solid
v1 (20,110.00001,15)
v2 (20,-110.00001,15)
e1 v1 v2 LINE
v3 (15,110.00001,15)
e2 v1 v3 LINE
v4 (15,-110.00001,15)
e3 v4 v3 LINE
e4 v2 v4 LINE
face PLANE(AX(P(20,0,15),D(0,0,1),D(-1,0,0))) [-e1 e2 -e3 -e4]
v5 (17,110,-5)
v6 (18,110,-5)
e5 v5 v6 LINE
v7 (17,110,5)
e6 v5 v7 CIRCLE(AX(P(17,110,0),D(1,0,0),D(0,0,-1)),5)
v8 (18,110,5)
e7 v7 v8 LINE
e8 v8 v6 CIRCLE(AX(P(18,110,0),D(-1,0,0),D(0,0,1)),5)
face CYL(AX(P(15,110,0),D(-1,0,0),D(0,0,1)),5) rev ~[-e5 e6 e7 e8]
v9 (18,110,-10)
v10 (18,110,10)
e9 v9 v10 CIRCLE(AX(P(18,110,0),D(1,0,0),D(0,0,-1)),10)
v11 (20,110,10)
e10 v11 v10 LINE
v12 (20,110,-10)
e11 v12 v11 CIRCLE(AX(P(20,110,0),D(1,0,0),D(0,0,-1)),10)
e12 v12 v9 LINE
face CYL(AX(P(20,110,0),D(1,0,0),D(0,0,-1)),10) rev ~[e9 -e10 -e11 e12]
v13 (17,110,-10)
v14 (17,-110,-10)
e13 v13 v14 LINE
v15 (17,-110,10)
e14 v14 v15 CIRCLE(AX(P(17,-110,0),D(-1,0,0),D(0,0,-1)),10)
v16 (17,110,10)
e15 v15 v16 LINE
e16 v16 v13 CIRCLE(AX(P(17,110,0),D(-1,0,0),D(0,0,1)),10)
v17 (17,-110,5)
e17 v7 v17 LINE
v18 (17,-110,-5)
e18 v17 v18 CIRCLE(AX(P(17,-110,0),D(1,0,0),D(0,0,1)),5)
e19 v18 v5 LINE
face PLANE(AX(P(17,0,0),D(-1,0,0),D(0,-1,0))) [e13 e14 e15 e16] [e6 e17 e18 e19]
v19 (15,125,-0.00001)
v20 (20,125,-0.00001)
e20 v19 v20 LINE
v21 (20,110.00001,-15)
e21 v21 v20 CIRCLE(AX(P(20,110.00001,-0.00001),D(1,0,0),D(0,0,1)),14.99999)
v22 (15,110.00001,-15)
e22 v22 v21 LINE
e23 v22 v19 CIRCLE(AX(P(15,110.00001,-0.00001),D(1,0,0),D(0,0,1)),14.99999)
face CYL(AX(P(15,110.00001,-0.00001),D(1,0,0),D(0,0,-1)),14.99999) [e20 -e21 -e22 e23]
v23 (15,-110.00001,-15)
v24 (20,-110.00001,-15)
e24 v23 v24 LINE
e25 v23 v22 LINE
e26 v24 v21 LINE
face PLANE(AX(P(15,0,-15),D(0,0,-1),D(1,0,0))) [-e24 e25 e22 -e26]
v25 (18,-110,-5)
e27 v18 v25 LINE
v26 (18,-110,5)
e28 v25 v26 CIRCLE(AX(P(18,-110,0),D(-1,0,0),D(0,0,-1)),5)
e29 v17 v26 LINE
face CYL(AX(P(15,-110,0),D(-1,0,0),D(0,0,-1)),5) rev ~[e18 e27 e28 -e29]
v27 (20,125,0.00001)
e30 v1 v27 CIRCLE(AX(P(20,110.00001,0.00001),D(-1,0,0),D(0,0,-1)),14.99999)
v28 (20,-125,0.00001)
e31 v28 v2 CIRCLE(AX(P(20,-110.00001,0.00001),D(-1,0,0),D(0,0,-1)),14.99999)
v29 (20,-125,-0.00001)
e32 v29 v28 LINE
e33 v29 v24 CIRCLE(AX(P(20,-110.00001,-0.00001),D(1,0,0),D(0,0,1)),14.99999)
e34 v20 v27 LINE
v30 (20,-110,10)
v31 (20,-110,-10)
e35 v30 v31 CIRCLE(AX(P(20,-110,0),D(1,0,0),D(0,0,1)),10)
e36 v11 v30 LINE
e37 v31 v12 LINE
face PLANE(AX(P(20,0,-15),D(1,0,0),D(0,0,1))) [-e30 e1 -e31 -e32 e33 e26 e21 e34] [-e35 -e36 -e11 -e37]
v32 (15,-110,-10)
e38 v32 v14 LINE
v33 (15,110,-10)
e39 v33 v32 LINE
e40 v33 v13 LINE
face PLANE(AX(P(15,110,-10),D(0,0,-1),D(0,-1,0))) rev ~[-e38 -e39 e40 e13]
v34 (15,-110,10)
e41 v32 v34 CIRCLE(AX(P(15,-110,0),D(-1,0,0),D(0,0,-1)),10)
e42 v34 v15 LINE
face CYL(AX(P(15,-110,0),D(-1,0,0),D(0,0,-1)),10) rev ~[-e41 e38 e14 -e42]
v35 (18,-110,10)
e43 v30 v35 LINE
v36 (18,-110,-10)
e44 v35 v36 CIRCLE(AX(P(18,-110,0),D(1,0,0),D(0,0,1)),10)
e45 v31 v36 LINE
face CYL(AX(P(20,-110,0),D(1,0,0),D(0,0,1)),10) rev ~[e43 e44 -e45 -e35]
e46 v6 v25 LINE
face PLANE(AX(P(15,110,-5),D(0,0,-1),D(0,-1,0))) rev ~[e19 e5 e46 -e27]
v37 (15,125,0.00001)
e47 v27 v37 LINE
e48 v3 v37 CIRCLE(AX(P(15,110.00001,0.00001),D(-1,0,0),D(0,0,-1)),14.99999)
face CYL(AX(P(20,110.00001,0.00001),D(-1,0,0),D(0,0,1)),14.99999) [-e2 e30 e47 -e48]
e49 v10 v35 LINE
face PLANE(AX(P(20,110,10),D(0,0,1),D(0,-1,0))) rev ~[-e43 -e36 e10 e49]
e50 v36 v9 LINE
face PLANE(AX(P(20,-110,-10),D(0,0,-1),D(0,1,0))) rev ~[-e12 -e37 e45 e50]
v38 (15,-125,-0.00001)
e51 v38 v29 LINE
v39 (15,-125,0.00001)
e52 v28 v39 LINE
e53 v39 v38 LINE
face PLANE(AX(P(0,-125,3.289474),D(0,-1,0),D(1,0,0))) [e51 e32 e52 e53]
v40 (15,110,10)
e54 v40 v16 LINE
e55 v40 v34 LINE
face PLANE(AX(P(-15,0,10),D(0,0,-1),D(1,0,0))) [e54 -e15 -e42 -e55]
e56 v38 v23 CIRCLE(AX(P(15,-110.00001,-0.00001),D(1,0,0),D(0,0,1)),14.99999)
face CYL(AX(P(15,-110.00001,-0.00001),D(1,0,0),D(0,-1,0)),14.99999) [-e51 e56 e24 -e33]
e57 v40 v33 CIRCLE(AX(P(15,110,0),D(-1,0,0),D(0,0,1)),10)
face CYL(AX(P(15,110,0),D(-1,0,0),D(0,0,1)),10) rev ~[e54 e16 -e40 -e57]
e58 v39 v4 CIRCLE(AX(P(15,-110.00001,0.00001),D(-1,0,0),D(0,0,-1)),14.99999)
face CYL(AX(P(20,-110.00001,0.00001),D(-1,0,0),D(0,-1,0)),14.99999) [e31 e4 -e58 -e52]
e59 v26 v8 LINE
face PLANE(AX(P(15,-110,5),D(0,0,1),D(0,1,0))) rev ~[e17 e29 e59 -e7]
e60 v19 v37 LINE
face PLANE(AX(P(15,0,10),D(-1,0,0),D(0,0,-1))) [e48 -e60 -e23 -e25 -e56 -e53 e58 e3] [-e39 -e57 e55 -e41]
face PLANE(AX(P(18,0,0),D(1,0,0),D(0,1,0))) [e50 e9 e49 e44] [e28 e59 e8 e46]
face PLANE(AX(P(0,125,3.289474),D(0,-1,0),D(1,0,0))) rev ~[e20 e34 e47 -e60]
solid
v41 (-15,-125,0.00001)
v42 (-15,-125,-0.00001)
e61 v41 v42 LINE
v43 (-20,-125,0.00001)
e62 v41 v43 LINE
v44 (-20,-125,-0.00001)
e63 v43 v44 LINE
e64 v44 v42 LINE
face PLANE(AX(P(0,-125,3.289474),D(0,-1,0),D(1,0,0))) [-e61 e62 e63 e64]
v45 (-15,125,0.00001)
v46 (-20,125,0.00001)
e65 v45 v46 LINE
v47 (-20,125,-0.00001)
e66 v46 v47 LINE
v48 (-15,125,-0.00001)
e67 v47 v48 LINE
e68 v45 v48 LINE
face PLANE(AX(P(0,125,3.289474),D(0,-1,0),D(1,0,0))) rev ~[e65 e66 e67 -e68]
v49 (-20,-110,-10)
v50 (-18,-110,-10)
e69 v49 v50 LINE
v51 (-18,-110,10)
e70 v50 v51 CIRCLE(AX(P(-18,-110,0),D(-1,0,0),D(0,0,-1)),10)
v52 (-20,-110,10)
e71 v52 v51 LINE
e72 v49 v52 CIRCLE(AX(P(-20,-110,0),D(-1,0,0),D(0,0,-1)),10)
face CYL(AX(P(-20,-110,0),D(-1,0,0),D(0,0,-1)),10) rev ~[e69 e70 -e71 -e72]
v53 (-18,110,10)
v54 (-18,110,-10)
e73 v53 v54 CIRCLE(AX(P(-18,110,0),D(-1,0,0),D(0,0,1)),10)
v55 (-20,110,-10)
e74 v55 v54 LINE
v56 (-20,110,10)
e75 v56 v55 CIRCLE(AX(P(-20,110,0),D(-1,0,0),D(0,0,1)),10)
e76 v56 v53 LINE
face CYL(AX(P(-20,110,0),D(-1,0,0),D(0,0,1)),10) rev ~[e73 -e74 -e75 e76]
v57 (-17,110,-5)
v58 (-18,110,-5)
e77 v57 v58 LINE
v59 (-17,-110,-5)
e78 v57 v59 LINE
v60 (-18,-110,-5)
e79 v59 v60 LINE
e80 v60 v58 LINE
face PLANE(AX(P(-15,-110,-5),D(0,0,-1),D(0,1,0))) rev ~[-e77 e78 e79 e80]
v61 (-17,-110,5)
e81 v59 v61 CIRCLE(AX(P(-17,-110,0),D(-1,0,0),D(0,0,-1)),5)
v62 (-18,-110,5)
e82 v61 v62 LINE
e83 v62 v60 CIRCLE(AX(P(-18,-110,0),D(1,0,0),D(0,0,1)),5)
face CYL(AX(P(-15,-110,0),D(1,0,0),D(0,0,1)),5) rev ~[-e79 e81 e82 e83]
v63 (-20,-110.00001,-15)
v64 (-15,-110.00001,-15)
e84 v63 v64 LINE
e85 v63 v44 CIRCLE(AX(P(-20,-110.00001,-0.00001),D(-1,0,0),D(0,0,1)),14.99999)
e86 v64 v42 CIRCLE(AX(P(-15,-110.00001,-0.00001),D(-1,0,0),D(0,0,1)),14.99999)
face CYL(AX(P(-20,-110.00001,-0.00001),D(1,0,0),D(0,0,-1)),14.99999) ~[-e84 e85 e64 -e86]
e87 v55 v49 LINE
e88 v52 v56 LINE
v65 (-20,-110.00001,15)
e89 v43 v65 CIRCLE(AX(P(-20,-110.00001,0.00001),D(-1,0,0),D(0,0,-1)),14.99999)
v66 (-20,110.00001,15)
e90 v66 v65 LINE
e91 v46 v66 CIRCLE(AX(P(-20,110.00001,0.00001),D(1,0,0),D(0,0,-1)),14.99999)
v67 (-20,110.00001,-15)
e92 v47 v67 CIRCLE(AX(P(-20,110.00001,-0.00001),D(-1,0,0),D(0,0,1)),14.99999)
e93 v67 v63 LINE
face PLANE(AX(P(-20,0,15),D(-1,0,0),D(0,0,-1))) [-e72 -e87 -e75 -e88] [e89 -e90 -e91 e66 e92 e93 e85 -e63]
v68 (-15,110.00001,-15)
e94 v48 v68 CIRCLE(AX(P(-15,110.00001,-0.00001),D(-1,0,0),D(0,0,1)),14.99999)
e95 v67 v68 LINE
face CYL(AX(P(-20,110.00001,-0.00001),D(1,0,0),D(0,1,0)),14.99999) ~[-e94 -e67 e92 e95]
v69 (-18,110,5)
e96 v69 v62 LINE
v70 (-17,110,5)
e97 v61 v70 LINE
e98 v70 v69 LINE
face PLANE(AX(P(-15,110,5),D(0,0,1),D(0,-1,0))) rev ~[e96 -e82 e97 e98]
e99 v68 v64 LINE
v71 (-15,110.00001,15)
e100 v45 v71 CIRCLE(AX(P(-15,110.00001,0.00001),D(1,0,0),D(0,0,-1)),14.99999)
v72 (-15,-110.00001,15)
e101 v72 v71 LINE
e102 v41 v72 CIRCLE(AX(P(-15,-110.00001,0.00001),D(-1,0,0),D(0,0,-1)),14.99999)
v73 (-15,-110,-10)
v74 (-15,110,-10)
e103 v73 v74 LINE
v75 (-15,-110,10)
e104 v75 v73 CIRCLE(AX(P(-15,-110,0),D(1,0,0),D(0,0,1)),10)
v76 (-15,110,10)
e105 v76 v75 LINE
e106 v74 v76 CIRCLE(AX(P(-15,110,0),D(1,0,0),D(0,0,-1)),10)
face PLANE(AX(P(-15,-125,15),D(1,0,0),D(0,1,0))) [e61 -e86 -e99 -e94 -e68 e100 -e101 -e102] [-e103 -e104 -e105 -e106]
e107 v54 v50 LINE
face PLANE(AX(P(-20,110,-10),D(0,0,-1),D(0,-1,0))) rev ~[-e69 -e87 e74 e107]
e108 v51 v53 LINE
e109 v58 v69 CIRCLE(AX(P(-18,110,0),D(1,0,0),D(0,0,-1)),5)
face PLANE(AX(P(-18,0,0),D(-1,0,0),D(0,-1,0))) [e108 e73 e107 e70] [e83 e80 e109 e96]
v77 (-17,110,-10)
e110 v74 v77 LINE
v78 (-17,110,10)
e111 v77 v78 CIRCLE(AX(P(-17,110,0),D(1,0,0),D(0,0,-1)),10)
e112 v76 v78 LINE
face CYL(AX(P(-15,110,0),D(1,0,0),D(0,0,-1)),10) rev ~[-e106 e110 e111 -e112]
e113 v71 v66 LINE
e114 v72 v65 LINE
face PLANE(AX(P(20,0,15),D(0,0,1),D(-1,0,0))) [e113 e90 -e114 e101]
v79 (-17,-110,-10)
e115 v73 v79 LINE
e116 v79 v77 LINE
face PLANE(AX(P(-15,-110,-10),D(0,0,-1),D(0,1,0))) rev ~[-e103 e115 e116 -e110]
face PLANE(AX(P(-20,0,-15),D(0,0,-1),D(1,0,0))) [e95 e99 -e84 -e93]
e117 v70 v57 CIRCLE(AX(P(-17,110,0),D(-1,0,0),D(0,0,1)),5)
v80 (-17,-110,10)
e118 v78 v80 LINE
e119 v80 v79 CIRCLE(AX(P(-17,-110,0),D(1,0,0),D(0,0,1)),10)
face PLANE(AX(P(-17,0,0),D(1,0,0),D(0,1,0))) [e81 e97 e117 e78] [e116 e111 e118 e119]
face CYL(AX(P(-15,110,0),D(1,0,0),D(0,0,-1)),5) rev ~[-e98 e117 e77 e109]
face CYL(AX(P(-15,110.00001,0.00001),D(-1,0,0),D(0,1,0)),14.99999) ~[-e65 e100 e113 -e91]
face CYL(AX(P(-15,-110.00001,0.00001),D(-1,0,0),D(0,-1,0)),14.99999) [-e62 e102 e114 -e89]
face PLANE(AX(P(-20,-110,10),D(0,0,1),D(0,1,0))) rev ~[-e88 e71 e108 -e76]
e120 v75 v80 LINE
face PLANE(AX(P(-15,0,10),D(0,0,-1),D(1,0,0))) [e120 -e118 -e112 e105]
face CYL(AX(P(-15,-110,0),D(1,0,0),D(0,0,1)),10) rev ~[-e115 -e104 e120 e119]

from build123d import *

# Parameters (mm, degrees)
F1_DEPTH      = 125
F1_DEPTH_BACK = 125
F6_DEPTH      = 5.001
F7_DEPTH      = 5.001
F8_DEPTH      = 2
F9_DEPTH      = 2
F10_DEPTH     = 2
F11_DEPTH     = 2
F12_W         = 30
F12_H         = 250
F13_DEPTH     = 30.001
F14_R         = 14.99999


# Not quite as in the source:
# - a fillet or chamfer is up to 0.001 mm smaller than in the source, because OpenCascade refuses the exact size


with BuildPart() as f1:
    # F0 (on Front) → F1 (new body, two sides)
    with BuildSketch(Plane.XZ) as f1_sk:
        Polygon((20, -15), (20, 15), (-20, 15), (-20, -15), (-15, -15), (-15, 10), (15, 10), (15, -15), align=None)
    extrude(amount=F1_DEPTH)
    extrude(f1_sk.sketch, amount=-F1_DEPTH_BACK)

    # F2 (on face) → F6 (cut, through all)
    with BuildSketch(Plane(origin=(15, 0, 0), x_dir=(0, -1, 0), z_dir=(-1, 0, 0))):
        with BuildLine():
            Line((-110, -5), (110, -5))
            ThreePointArc((110, -5), (115, 0), (110, 5))
            Line((110, 5), (-110, 5))
            ThreePointArc((-110, 5), (-115, 0), (-110, -5))
        make_face()
    extrude(amount=-F6_DEPTH, mode=Mode.SUBTRACT)

    # F4 (on face) → F7 (cut, through all)
    with BuildSketch(Plane.YZ.offset(-15)):
        with BuildLine():
            Line((110, 5), (-110, 5))
            ThreePointArc((-110, 5), (-115, 0), (-110, -5))
            Line((-110, -5), (110, -5))
            ThreePointArc((110, -5), (115, 0), (110, 5))
        make_face()
    extrude(amount=-F7_DEPTH, mode=Mode.SUBTRACT)

    # F2 (on face) → F8 (cut)
    with BuildSketch(Plane(origin=(15, 0, 0), x_dir=(0, -1, 0), z_dir=(-1, 0, 0))):
        with BuildLine():
            Line((-110, -10), (110, -10))
            ThreePointArc((110, -10), (120, 0), (110, 10))
            Line((110, 10), (-110, 10))
            ThreePointArc((-110, 10), (-120, 0), (-110, -10))
        make_face()
        with BuildLine():
            ThreePointArc((110, 5), (115, 0), (110, -5))
            Line((110, -5), (-110, -5))
            ThreePointArc((-110, -5), (-115, 0), (-110, 5))
            Line((-110, 5), (110, 5))
        make_face(mode=Mode.SUBTRACT)
    extrude(amount=-F8_DEPTH, mode=Mode.SUBTRACT)

    # F3 (on face) → F9 (cut)
    with BuildSketch(Plane.YZ.offset(20)):
        with BuildLine():
            ThreePointArc((-110, 10), (-120, 0), (-110, -10))
            Line((-110, -10), (110, -10))
            ThreePointArc((110, -10), (120, 0), (110, 10))
            Line((110, 10), (-110, 10))
        make_face()
        with BuildLine():
            ThreePointArc((-110, -5), (-115, 0), (-110, 5))
            Line((-110, 5), (110, 5))
            ThreePointArc((110, 5), (115, 0), (110, -5))
            Line((110, -5), (-110, -5))
        make_face(mode=Mode.SUBTRACT)
    extrude(amount=-F9_DEPTH, mode=Mode.SUBTRACT)

    # F5 (on face) → F10 (cut)
    with BuildSketch(Plane(origin=(-20, 0, 0), x_dir=(0, -1, 0), z_dir=(-1, 0, 0))):
        with BuildLine():
            Line((110, 10), (-110, 10))
            ThreePointArc((-110, 10), (-120, 0), (-110, -10))
            Line((-110, -10), (110, -10))
            ThreePointArc((110, -10), (120, 0), (110, 10))
        make_face()
        with BuildLine():
            ThreePointArc((-110, -5), (-115, 0), (-110, 5))
            Line((-110, 5), (110, 5))
            ThreePointArc((110, 5), (115, 0), (110, -5))
            Line((110, -5), (-110, -5))
        make_face(mode=Mode.SUBTRACT)
    extrude(amount=-F10_DEPTH, mode=Mode.SUBTRACT)

    # F4 (on face) → F11 (cut)
    with BuildSketch(Plane.YZ.offset(-15)):
        with BuildLine():
            Line((110, 10), (-110, 10))
            ThreePointArc((-110, 10), (-120, 0), (-110, -10))
            Line((-110, -10), (110, -10))
            ThreePointArc((110, -10), (120, 0), (110, 10))
        make_face()
        with BuildLine():
            ThreePointArc((-110, -5), (-115, 0), (-110, 5))
            Line((-110, 5), (110, 5))
            ThreePointArc((110, 5), (115, 0), (110, -5))
            Line((110, -5), (-110, -5))
        make_face(mode=Mode.SUBTRACT)
    extrude(amount=-F11_DEPTH, mode=Mode.SUBTRACT)

    # F12 (on face) → F13 (cut, through all)
    with BuildSketch(Plane.XY.offset(15)):
        Rectangle(F12_W, F12_H)
    extrude(amount=-F13_DEPTH, mode=Mode.SUBTRACT)

    # F14 (radius 15 in the source; OpenCascade refuses exactly that, so slightly less here)
    f14_edges = [f1.edges().sort_by_distance(p)[0] for p in [
        (-17.5, 125, -15),
        (17.5, 125, -15),
        (-17.5, -125, -15),
        (17.5, -125, -15),
        (-17.5, 125, 15),
        (17.5, 125, 15),
        (-17.5, -125, 15),
        (17.5, -125, 15),
    ]]
    fillet(f14_edges, radius=F14_R)


solid = f1.part
